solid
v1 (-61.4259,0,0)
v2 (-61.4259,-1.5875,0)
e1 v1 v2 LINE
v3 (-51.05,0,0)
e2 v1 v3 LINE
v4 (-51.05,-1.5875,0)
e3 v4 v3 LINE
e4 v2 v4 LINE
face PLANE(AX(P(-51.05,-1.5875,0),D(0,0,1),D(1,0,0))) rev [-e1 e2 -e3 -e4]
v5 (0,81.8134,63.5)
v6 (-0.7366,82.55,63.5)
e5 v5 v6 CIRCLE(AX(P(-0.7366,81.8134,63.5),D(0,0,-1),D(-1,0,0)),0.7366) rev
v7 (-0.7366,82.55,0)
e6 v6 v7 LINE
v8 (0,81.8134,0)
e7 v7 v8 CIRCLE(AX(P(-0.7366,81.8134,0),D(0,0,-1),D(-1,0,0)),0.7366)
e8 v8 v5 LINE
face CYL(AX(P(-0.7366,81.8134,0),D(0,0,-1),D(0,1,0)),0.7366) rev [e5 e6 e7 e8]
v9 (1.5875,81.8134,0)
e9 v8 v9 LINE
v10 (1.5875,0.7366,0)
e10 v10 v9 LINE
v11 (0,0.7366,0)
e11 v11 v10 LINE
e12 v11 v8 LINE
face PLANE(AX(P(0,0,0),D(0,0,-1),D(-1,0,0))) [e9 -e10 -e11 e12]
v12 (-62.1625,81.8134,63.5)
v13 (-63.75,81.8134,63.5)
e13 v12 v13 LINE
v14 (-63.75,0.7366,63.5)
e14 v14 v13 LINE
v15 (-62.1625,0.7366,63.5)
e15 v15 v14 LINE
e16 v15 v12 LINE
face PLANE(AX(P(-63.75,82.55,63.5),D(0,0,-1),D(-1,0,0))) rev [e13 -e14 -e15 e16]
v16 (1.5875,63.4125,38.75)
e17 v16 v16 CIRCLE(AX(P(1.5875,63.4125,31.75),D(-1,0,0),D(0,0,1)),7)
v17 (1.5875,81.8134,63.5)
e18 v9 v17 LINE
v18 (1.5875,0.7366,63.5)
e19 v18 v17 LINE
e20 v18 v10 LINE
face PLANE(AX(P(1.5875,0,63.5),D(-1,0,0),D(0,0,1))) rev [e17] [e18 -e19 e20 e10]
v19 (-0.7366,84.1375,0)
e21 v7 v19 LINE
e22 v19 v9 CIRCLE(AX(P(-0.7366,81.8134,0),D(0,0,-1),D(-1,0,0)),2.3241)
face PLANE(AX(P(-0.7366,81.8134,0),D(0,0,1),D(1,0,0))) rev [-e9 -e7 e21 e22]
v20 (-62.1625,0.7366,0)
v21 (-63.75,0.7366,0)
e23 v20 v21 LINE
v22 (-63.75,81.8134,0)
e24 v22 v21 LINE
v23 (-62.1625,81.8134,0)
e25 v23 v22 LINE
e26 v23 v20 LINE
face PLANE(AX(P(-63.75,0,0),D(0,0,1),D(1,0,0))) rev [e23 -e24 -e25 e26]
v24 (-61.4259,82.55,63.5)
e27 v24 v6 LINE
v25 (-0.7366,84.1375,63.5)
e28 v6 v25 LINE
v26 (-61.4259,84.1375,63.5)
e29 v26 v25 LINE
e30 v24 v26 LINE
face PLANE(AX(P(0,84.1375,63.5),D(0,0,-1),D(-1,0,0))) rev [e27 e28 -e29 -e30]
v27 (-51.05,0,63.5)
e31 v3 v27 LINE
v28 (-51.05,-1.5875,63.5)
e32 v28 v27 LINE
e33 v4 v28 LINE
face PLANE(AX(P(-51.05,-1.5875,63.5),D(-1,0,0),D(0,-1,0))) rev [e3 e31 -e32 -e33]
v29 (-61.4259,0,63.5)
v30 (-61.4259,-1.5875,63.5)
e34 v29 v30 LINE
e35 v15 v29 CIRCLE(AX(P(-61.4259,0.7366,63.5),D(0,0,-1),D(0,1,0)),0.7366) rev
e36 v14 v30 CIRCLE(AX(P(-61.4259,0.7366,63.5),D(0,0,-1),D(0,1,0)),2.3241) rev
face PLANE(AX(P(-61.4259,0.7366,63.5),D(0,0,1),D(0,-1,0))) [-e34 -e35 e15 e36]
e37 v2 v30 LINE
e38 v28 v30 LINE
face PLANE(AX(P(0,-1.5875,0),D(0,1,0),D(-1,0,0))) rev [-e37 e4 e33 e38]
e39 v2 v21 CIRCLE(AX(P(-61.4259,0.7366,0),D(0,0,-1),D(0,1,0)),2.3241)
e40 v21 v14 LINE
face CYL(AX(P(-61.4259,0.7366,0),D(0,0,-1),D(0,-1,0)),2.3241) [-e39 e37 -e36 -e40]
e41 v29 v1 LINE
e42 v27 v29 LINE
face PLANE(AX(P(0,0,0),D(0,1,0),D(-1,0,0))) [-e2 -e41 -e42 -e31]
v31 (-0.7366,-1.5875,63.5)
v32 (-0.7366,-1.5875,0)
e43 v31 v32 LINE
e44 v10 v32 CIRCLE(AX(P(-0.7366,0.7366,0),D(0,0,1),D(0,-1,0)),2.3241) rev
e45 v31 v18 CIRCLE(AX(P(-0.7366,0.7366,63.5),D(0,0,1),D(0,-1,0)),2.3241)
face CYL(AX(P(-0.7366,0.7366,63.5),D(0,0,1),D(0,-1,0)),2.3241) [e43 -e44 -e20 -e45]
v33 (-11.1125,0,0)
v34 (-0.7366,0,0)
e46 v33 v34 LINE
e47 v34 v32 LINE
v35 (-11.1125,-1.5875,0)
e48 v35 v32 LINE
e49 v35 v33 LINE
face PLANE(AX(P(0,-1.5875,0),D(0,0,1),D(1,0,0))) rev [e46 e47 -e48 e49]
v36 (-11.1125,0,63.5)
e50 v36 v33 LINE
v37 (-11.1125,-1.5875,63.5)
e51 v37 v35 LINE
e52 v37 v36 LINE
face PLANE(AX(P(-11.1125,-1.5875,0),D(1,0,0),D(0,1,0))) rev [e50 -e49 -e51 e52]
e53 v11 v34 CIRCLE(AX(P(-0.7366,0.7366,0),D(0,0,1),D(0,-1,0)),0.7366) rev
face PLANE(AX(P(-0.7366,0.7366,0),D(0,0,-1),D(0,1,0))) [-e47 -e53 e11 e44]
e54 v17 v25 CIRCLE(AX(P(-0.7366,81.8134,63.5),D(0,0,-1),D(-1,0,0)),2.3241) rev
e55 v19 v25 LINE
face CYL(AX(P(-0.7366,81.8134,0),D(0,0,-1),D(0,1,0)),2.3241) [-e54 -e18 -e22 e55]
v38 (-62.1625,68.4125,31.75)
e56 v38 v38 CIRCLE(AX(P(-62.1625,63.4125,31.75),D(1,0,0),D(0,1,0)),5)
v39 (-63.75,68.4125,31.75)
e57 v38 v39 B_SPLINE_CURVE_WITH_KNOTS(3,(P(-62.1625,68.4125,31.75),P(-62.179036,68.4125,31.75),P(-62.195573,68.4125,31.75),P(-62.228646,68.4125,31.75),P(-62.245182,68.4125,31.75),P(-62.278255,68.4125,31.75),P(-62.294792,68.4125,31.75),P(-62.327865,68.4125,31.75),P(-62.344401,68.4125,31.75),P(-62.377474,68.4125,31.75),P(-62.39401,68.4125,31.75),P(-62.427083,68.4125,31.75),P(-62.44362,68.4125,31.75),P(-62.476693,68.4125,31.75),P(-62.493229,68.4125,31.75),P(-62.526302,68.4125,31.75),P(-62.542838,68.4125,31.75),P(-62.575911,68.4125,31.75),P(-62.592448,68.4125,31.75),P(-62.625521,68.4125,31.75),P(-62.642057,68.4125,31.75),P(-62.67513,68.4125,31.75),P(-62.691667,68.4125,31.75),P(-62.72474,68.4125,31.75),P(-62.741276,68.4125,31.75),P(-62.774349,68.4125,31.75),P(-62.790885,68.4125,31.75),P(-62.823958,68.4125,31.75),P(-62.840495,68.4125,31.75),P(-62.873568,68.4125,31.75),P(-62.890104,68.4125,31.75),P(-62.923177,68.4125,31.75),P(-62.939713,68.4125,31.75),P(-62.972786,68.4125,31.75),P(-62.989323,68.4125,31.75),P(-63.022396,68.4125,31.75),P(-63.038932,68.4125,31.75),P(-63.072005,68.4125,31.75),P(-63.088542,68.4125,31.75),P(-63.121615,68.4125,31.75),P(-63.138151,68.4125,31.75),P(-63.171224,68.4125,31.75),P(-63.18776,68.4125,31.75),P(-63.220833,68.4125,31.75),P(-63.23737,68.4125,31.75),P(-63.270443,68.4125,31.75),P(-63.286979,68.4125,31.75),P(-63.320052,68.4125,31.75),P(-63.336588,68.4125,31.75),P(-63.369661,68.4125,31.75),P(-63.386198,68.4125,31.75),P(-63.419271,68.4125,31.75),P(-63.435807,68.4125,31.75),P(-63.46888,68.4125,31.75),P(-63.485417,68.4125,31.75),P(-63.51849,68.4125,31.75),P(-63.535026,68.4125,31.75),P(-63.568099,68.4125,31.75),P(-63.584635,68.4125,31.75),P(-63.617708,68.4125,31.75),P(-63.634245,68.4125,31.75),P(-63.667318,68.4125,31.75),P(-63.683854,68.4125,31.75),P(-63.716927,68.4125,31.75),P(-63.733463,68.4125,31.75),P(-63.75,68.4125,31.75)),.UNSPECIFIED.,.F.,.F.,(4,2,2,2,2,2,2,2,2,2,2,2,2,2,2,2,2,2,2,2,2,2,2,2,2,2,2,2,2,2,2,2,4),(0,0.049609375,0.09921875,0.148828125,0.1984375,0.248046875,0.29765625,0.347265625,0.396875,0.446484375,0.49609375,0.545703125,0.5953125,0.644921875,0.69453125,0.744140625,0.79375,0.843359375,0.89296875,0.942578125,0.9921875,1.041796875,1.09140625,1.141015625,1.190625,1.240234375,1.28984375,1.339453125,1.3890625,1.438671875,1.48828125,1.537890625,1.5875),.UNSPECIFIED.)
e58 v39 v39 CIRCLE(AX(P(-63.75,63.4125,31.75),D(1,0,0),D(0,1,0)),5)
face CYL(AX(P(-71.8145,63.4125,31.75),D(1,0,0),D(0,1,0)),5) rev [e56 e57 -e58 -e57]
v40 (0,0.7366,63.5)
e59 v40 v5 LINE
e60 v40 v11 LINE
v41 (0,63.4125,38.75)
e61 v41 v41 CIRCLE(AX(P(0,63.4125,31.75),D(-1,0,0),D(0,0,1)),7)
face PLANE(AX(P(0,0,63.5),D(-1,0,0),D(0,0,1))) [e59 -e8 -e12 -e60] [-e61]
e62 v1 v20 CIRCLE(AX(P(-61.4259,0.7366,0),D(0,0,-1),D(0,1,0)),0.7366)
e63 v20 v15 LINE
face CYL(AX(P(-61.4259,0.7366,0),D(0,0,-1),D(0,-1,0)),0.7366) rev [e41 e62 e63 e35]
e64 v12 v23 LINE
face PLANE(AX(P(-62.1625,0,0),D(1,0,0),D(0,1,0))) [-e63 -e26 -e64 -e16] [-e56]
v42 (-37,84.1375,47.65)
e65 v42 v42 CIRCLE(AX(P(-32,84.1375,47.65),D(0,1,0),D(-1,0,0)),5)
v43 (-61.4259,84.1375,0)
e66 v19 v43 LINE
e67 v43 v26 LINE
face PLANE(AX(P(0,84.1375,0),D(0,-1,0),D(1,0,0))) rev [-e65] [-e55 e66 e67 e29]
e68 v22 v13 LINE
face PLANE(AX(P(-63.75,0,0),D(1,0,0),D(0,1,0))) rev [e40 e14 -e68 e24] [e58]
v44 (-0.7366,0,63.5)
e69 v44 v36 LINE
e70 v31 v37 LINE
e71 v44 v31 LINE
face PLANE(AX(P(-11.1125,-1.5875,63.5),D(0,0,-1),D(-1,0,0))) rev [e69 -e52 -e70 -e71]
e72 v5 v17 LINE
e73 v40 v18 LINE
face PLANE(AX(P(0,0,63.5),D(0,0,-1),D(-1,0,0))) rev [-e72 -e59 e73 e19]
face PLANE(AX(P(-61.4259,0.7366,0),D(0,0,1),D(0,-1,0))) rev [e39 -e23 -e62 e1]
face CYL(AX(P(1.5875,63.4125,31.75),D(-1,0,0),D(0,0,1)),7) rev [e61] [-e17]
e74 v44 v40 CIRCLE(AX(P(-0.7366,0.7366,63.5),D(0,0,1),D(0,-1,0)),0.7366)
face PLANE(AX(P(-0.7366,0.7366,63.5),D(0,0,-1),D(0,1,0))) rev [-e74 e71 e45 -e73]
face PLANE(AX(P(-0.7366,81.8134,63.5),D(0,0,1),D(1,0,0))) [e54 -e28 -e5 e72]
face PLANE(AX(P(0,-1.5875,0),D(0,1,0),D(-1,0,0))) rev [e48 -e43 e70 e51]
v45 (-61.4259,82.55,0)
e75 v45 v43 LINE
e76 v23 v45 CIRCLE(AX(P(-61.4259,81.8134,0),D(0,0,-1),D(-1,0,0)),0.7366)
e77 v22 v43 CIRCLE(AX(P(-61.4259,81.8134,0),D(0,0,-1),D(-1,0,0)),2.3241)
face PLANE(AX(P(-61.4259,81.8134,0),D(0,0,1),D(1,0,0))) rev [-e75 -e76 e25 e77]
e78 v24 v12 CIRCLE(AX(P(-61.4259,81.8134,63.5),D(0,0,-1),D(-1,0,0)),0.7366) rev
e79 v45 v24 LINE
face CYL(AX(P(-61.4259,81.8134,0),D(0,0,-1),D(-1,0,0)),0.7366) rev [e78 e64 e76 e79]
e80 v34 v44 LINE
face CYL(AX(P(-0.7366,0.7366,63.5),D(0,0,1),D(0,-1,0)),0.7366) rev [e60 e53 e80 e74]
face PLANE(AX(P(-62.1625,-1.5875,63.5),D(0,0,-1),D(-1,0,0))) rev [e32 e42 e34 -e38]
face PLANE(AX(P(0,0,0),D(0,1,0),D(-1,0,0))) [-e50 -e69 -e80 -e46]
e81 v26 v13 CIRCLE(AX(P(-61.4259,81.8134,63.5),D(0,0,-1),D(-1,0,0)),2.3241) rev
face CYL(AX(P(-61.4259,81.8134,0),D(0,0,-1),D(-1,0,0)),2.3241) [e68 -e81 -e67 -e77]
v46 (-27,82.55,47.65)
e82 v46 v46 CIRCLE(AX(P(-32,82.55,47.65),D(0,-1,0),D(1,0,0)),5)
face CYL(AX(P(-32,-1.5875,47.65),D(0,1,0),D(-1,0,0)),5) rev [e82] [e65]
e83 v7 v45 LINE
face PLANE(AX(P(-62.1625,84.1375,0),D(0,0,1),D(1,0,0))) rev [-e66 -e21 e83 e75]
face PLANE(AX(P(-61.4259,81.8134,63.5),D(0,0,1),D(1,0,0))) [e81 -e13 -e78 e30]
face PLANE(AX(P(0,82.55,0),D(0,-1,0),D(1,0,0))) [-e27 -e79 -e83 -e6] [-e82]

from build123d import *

# Parameters (mm, degrees)
SKETCH2_W                    = 1.5875
SKETCH2_H                    = 82.55
BASE_FLANGE1_DEPTH           = 63.5
EDGE_FLANGE1_STRIP_W         = 7.8232
EDGE_FLANGE1_STRIP_H         = 1.5875
EDGE_FLANGE1_STRIP_CUT_DEPTH = 63.5
EDGE_FLANGE1_DEPTH           = 63.5
SKETCH10_R                   = 7
CUT_EXTRUDE1_DEPTH           = 105.73891424
EDGE_FLANGE2_STRIP_W         = 7.8232
EDGE_FLANGE2_STRIP_H         = 1.5875
EDGE_FLANGE2_STRIP_CUT_DEPTH = 63.5
EDGE_FLANGE2_DEPTH           = 63.5
EDGE_FLANGE3_STRIP_W         = 7.8232
EDGE_FLANGE3_STRIP_H         = 1.5875
EDGE_FLANGE3_STRIP_CUT_DEPTH = 63.5
EDGE_FLANGE3_DEPTH           = 63.5
EDGE_FLANGE4_STRIP_W         = 7.8232
EDGE_FLANGE4_STRIP_H         = 1.5875
EDGE_FLANGE4_STRIP_CUT_DEPTH = 63.5
EDGE_FLANGE4_DEPTH           = 63.5
SKETCH20_R                   = 5
CUT_EXTRUDE2_DEPTH           = 125.278268888
SKETCH21_R                   = 5
CUT_EXTRUDE3_DEPTH           = 9.652


# Sheet-metal steps are written as plain solids
with BuildPart() as part:
    # Sketch2 → Base-Flange1 (new body)
    with BuildSketch(Plane.XY):
        with Locations((0.79375, 41.275)):
            Rectangle(SKETCH2_W, SKETCH2_H)
    extrude(amount=BASE_FLANGE1_DEPTH)

    # Edge-Flange1 strip (across the edge) → Edge-Flange1 strip cut (cut)
    with BuildSketch(Plane(origin=(0, 0, 0), x_dir=(0, 1, 0), z_dir=(0, 0, 1))):
        with Locations((-3.175, -0.79375)):
            Rectangle(EDGE_FLANGE1_STRIP_W, EDGE_FLANGE1_STRIP_H)
    extrude(amount=EDGE_FLANGE1_STRIP_CUT_DEPTH, mode=Mode.SUBTRACT)

    # Edge-Flange1 section (across the edge) → Edge-Flange1 (add)
    with BuildSketch(Plane(origin=(0, 0, 0), x_dir=(0, 1, 0), z_dir=(0, 0, 1))):
        with BuildLine():
            Line((-1.5875, 0.7366), (-1.5875, 11.1125))
            Line((-1.5875, 11.1125), (0, 11.1125))
            Line((0, 11.1125), (0, 0.7366))
            ThreePointArc((0, 0.7366), (0.215745145, 0.215745145), (0.7366, 0))
            Line((0.7366, 0), (0.7366, -1.5875))
            ThreePointArc((0.7366, -1.5875), (-0.90678687, -0.90678687), (-1.5875, 0.7366))
        make_face()
    extrude(amount=EDGE_FLANGE1_DEPTH)

    # Sketch10 → Cut-Extrude1 (cut, through all)
    with BuildSketch(Plane.ZY):
        with Locations((31.75, 63.4125)):
            Circle(SKETCH10_R)
    extrude(amount=-CUT_EXTRUDE1_DEPTH, mode=Mode.SUBTRACT)

    # Edge-Flange2 strip (across the edge) → Edge-Flange2 strip cut (cut)
    with BuildSketch(Plane(origin=(0, 82.55, 63.5), x_dir=(0, -1, 0), z_dir=(0, 0, -1))):
        with Locations((-3.175, -0.79375)):
            Rectangle(EDGE_FLANGE2_STRIP_W, EDGE_FLANGE2_STRIP_H)
    extrude(amount=EDGE_FLANGE2_STRIP_CUT_DEPTH, mode=Mode.SUBTRACT)

    # Edge-Flange2 section (across the edge) → Edge-Flange2 (add)
    with BuildSketch(Plane(origin=(0, 82.55, 63.5), x_dir=(0, -1, 0), z_dir=(0, 0, -1))):
        with BuildLine():
            Line((-1.5875, 0.7366), (-1.5875, 62.162499944))
            Line((-1.5875, 62.162499944), (0, 62.162499944))
            Line((0, 62.162499944), (0, 0.7366))
            ThreePointArc((0, 0.7366), (0.215745145, 0.215745145), (0.7366, 0))
            Line((0.7366, 0), (0.7366, -1.5875))
            ThreePointArc((0.7366, -1.5875), (-0.90678687, -0.90678687), (-1.5875, 0.7366))
        make_face()
    extrude(amount=EDGE_FLANGE2_DEPTH)

    # Edge-Flange3 strip (across the edge) → Edge-Flange3 strip cut (cut)
    with BuildSketch(Plane(origin=(-62.162499944, 82.55, 63.5), x_dir=(1, 0, 0), z_dir=(0, 0, -1))):
        with Locations((-3.175, -0.79375)):
            Rectangle(EDGE_FLANGE3_STRIP_W, EDGE_FLANGE3_STRIP_H)
    extrude(amount=EDGE_FLANGE3_STRIP_CUT_DEPTH, mode=Mode.SUBTRACT)

    # Edge-Flange3 section (across the edge) → Edge-Flange3 (add)
    with BuildSketch(Plane(origin=(-62.162499944, 82.55, 63.5), x_dir=(1, 0, 0), z_dir=(0, 0, -1))):
        with BuildLine():
            Line((-1.5875, 0.7366), (-1.5875, 82.55))
            Line((-1.5875, 82.55), (0, 82.55))
            Line((0, 82.55), (0, 0.7366))
            ThreePointArc((0, 0.7366), (0.215745145, 0.215745145), (0.7366, 0))
            Line((0.7366, 0), (0.7366, -1.5875))
            ThreePointArc((0.7366, -1.5875), (-0.90678687, -0.90678687), (-1.5875, 0.7366))
        make_face()
    extrude(amount=EDGE_FLANGE3_DEPTH)

    # Edge-Flange4 strip (across the edge) → Edge-Flange4 strip cut (cut)
    with BuildSketch(Plane(origin=(-62.162499944, 0, 63.5), x_dir=(0, 1, 0), z_dir=(0, 0, -1))):
        with Locations((-3.175, -0.79375)):
            Rectangle(EDGE_FLANGE4_STRIP_W, EDGE_FLANGE4_STRIP_H)
    extrude(amount=EDGE_FLANGE4_STRIP_CUT_DEPTH, mode=Mode.SUBTRACT)

    # Edge-Flange4 section (across the edge) → Edge-Flange4 (add)
    with BuildSketch(Plane(origin=(-62.162499944, 0, 63.5), x_dir=(0, 1, 0), z_dir=(0, 0, -1))):
        with BuildLine():
            Line((-1.5875, 0.7366), (-1.5875, 11.1125))
            Line((-1.5875, 11.1125), (0, 11.1125))
            Line((0, 11.1125), (0, 0.7366))
            ThreePointArc((0, 0.7366), (0.215745145, 0.215745145), (0.7366, 0))
            Line((0.7366, 0), (0.7366, -1.5875))
            ThreePointArc((0.7366, -1.5875), (-0.90678687, -0.90678687), (-1.5875, 0.7366))
        make_face()
    extrude(amount=EDGE_FLANGE4_DEPTH)

    # Sketch20 → Cut-Extrude2 (cut, through all)
    with BuildSketch(Plane(origin=(0, 84.1375, 0), x_dir=(1, 0, 0), z_dir=(0, 1, 0))):
        with Locations(Location((-32, -47.64999995, 0), (0, 0, 180))):
            Circle(SKETCH20_R)
    extrude(amount=-CUT_EXTRUDE2_DEPTH, mode=Mode.SUBTRACT)

    # Sketch21 → Cut-Extrude3 (cut)
    with BuildSketch(Plane(origin=(-62.162499944, 0, 0), x_dir=(0, 0, -1), z_dir=(1, 0, 0))):
        with Locations(Location((-31.75, 63.4125, 0), (0, 0, 90))):
            Circle(SKETCH21_R)
    extrude(amount=-CUT_EXTRUDE3_DEPTH, mode=Mode.SUBTRACT)


solid = part.part
